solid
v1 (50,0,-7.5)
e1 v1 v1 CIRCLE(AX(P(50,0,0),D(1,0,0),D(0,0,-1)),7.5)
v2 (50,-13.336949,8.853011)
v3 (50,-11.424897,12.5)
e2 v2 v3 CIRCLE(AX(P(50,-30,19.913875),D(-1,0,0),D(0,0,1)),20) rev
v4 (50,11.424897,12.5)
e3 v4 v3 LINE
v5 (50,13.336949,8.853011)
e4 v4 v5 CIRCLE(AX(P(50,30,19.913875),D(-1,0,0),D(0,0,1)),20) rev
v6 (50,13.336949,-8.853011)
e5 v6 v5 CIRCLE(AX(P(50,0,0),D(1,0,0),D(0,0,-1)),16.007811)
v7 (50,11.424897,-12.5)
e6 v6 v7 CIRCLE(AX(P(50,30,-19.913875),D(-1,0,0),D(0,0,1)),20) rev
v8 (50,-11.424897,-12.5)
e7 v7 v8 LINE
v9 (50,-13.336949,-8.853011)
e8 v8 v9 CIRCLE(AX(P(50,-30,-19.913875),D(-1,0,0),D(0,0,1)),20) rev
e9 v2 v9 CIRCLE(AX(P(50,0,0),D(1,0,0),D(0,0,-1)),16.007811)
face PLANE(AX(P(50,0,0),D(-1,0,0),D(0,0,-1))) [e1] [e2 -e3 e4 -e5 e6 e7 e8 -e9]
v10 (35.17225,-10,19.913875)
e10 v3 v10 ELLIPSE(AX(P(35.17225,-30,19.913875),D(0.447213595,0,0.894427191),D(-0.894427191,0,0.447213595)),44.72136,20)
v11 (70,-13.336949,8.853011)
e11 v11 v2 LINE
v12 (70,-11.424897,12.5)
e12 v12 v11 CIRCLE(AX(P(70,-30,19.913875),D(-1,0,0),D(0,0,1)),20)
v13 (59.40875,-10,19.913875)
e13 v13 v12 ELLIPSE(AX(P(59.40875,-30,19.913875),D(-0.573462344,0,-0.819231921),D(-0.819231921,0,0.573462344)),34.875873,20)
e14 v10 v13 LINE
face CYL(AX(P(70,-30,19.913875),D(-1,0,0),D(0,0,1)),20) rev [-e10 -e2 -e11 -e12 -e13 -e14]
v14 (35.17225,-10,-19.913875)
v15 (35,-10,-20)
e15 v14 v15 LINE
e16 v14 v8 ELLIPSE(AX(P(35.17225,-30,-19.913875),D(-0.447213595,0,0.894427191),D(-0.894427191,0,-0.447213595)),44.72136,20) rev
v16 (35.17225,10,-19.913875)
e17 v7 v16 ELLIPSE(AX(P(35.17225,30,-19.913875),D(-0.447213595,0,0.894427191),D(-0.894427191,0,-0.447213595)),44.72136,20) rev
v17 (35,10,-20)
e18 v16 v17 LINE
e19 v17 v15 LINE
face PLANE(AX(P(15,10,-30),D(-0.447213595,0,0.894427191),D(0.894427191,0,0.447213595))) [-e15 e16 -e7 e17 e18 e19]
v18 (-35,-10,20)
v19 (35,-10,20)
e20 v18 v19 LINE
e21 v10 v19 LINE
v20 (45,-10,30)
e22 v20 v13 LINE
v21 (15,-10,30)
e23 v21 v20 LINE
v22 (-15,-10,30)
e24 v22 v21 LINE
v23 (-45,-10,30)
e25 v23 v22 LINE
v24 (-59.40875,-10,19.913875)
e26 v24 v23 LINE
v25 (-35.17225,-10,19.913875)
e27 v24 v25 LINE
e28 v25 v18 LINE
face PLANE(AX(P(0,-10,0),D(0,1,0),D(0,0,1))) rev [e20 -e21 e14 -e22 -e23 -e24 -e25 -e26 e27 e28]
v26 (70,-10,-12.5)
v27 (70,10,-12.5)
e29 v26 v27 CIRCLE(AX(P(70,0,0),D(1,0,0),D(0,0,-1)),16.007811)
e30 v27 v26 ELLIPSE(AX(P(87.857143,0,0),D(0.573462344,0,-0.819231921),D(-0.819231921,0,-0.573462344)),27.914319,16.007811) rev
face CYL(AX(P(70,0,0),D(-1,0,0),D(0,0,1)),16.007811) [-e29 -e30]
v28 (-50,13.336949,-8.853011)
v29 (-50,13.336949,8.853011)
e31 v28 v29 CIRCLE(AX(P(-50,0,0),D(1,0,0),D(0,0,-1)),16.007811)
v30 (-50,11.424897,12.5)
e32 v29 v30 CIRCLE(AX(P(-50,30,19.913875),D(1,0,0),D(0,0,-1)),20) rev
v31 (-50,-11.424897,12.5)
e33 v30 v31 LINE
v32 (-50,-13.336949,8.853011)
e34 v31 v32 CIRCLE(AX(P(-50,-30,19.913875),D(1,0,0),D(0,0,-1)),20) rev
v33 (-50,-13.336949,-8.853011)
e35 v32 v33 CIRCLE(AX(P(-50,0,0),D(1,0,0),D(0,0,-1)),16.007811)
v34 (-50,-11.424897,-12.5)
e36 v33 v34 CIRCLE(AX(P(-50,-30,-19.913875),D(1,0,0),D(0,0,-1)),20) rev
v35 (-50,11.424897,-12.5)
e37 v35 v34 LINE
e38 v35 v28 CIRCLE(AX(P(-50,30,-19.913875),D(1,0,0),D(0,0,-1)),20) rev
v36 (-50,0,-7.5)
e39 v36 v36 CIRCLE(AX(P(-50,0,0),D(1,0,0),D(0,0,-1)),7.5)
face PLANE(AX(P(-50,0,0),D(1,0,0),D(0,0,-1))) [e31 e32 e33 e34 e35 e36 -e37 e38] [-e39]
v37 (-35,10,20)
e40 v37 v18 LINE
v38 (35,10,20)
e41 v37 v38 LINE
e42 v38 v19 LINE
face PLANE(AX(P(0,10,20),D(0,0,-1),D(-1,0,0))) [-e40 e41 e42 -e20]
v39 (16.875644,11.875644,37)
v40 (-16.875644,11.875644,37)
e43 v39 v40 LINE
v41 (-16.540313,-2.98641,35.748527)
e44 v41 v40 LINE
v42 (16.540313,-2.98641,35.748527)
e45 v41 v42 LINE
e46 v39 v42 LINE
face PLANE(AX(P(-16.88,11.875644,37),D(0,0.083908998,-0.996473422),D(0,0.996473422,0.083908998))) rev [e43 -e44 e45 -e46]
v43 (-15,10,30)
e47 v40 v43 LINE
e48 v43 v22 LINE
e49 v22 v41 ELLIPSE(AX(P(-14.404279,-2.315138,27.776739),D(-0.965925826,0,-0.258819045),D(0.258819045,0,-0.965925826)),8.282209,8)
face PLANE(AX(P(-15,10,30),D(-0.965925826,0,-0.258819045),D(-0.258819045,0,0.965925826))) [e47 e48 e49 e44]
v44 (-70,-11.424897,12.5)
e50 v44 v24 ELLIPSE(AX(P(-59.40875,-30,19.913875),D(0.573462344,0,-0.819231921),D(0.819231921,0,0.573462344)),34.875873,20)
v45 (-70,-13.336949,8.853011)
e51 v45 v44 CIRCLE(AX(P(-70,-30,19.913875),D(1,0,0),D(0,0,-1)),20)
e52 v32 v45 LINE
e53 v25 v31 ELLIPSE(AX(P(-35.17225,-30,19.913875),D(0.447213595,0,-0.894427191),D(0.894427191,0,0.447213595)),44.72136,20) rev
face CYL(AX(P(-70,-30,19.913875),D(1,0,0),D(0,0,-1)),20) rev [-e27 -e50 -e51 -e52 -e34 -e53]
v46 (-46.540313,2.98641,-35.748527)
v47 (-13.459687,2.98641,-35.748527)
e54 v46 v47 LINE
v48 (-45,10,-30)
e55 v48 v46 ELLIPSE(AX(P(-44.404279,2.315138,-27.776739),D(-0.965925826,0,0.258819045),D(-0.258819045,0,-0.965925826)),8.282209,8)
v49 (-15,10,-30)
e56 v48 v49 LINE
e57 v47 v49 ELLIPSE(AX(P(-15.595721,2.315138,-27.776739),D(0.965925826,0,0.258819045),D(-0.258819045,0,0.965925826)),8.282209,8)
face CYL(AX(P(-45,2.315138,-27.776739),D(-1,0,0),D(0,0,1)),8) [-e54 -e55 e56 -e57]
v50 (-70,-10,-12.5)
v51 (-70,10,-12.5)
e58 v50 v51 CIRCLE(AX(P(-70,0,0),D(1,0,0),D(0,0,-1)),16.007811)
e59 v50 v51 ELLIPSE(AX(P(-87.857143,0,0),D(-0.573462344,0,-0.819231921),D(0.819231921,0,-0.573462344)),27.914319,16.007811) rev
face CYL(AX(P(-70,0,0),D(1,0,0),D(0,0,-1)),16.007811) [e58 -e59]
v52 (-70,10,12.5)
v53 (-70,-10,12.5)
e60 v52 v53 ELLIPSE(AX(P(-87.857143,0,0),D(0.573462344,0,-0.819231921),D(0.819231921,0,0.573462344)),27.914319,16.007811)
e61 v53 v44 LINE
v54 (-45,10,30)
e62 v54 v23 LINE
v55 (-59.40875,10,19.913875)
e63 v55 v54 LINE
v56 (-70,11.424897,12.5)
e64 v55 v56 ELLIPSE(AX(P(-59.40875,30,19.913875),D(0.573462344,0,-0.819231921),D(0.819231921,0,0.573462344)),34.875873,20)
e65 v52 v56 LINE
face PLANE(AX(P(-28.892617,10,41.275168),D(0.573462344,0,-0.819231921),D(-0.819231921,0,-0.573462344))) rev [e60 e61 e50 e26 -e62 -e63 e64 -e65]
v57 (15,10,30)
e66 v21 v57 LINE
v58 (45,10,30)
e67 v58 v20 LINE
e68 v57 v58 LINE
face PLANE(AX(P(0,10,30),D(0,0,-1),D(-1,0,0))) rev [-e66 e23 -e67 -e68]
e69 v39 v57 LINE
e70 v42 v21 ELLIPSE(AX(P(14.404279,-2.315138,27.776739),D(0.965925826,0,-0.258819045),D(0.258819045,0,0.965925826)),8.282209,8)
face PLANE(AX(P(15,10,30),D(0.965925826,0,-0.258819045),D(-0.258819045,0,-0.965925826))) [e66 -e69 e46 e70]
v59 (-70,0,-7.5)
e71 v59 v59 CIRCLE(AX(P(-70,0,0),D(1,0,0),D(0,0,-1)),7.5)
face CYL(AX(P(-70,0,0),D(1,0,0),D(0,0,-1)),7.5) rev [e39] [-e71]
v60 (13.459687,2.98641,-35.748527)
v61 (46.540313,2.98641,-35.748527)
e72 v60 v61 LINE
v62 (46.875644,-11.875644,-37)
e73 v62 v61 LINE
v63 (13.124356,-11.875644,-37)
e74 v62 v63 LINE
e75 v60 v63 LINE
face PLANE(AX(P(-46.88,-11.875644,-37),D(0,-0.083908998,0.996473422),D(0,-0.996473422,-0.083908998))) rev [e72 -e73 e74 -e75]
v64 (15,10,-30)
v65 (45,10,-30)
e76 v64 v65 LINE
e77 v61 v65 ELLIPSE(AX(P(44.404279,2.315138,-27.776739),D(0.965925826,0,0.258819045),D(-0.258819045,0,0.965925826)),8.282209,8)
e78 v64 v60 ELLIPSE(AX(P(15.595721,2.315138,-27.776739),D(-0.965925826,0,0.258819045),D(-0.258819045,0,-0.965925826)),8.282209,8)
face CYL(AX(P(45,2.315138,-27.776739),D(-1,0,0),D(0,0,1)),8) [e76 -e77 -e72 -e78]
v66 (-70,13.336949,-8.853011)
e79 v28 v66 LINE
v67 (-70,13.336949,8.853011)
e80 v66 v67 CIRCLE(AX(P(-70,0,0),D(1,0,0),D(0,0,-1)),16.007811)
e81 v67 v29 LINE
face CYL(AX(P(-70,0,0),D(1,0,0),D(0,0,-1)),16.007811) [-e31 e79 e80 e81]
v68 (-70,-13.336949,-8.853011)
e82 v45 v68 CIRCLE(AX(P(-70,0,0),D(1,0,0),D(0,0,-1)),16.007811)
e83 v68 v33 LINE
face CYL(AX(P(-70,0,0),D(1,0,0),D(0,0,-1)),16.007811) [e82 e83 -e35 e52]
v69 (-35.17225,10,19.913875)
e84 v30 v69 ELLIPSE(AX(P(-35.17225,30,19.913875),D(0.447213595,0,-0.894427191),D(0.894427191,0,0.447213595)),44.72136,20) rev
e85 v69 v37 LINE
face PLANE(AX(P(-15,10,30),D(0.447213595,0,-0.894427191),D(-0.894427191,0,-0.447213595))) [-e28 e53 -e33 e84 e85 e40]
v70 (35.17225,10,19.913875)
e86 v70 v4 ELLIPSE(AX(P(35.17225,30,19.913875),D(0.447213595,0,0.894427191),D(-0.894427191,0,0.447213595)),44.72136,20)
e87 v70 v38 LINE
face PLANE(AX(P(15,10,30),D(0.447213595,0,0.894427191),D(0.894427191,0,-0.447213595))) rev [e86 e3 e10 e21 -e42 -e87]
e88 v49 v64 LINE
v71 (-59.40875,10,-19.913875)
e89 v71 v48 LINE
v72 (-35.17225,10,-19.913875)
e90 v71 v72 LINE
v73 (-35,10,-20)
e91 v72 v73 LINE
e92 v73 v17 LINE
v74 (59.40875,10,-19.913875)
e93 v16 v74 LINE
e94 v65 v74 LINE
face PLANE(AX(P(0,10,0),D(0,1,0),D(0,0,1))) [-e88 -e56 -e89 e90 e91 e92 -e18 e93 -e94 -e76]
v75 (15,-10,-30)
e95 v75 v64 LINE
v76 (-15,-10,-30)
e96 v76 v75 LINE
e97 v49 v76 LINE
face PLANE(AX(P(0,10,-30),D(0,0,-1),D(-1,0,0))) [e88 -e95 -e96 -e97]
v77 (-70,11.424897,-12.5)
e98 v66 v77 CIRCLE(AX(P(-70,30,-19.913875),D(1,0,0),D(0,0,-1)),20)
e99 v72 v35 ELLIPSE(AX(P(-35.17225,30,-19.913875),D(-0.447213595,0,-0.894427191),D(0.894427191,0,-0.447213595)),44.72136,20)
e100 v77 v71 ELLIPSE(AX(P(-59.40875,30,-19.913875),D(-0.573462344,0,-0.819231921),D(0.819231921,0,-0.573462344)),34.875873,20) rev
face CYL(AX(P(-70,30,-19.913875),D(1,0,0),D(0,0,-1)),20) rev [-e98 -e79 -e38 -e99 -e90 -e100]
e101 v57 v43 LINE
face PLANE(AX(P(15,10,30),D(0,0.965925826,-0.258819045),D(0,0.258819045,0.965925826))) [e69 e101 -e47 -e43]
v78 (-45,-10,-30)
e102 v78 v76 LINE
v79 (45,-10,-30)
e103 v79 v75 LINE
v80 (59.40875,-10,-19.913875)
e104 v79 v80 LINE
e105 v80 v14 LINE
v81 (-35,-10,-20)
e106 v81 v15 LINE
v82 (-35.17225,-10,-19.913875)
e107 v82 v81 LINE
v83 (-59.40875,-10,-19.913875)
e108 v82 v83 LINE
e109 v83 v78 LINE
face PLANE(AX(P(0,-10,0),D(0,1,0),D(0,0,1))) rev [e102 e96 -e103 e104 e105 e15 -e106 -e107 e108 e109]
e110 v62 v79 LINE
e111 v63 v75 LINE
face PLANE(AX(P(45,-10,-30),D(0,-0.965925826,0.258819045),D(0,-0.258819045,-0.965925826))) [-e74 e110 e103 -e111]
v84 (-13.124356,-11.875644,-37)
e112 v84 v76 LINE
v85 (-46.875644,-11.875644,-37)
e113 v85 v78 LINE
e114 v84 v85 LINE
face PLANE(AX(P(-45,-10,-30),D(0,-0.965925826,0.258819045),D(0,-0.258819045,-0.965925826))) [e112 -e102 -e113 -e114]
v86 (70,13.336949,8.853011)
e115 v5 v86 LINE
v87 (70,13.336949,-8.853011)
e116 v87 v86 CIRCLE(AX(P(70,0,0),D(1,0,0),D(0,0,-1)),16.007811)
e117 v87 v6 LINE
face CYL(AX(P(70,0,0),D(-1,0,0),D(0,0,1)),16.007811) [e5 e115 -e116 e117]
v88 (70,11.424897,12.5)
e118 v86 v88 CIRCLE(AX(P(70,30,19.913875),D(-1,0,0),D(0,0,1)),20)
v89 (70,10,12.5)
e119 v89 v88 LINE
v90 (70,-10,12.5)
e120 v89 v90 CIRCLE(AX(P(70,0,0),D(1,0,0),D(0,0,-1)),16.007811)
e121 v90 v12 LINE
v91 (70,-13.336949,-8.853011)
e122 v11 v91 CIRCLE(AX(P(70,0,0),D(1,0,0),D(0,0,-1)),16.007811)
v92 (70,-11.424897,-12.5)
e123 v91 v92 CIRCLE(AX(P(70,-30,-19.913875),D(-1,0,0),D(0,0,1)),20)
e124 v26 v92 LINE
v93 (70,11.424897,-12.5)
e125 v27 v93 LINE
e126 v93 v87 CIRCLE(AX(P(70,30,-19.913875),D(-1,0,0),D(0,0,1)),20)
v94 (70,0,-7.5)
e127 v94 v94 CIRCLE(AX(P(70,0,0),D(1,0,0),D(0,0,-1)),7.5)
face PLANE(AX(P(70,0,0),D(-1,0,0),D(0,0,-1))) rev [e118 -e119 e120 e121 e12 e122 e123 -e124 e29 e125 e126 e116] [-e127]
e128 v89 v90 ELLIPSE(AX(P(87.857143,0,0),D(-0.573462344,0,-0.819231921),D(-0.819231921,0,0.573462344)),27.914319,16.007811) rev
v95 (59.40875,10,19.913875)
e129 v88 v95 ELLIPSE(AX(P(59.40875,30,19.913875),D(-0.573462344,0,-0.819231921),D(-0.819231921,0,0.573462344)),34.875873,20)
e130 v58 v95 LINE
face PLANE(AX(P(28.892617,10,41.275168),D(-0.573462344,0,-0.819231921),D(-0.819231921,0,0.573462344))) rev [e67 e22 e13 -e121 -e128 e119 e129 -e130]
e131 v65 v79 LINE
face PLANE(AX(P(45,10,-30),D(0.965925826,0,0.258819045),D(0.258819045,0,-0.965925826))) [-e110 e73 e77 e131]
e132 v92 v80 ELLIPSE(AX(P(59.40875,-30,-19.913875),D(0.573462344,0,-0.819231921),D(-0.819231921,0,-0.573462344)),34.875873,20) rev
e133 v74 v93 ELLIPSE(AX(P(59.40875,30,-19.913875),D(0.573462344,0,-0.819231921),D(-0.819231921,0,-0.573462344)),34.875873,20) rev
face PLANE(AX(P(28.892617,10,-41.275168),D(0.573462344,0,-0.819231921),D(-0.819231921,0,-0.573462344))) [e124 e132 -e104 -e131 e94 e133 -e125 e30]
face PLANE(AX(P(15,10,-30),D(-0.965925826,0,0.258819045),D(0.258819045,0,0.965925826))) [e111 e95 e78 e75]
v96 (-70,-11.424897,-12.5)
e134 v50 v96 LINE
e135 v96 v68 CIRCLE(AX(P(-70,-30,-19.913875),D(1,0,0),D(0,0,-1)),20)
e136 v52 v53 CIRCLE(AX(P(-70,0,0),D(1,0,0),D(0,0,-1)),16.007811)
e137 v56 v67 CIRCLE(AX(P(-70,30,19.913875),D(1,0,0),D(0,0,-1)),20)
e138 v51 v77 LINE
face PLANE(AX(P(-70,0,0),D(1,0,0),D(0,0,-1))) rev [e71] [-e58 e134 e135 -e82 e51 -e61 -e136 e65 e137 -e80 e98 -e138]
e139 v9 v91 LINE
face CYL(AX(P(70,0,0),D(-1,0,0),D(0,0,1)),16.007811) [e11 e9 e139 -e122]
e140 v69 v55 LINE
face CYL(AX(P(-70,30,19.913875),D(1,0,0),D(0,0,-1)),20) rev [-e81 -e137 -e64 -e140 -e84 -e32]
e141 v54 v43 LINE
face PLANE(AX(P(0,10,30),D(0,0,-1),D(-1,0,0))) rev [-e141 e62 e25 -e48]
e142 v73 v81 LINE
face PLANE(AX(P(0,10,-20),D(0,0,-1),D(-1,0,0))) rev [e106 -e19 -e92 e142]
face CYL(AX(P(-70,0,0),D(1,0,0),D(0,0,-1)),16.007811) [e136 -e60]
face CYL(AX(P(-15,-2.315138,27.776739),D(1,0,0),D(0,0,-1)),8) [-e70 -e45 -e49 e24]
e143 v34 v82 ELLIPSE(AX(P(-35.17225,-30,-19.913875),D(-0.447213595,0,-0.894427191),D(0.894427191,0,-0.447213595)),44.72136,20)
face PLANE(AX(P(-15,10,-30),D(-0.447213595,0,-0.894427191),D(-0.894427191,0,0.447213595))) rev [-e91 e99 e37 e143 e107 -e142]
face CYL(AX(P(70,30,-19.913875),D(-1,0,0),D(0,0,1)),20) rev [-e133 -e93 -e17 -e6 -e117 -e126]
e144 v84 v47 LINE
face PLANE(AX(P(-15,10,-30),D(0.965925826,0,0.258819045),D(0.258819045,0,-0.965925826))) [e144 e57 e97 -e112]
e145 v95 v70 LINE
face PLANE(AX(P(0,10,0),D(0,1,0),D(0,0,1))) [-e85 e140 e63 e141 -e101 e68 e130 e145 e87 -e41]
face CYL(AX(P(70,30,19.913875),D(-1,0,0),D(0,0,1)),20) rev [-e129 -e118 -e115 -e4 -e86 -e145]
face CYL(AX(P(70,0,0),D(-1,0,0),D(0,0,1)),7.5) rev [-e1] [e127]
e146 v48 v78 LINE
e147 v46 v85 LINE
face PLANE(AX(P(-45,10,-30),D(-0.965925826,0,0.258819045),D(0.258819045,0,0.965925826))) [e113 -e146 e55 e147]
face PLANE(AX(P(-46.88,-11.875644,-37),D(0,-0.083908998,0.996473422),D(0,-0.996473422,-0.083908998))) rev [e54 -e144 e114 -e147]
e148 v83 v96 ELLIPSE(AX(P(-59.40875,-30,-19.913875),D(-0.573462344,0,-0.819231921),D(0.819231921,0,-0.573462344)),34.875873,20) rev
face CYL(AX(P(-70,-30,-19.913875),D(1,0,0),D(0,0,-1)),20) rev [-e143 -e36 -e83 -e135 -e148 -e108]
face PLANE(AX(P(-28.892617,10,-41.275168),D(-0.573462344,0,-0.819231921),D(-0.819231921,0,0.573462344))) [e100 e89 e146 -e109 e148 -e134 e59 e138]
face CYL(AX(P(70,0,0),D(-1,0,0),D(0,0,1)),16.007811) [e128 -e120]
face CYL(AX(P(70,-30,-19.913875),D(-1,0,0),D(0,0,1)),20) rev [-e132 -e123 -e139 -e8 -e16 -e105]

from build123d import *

# Parameters (mm, degrees)
RESSALTO_EXTRUS_O1_DEPTH           = 10
RESSALTO_EXTRUS_O1_2_DEPTH         = 10
ESBO_O2_R                          = 16.007810594
ESBO_O2_R_2                        = 7.5
RESSALTO_EXTRUS_O2_DEPTH           = 20
FILETE1_R                          = 20
ESBO_O3_W                          = 30
ESBO_O3_H                          = 20
RESSALTO_EXTRUS_O3_DEPTH           = 7
RESSALTO_EXTRUS_O3_DRAFT           = -15
ESBO_O4_W                          = 30
ESBO_O4_H                          = 20
RESSALTO_EXTRUS_O4_DEPTH           = 7
RESSALTO_EXTRUS_O4_DRAFT           = -15
RESSALTO_EXTRUS_O4_PROFILE_2_DEPTH = 7
RESSALTO_EXTRUS_O4_PROFILE_2_DRAFT = -15
CORTE_EXTRUS_O1_DEPTH              = 16.88
CORTE_EXTRUS_O2_DEPTH              = 46.88
FILETE4_R                          = 8


with BuildPart() as part:
    # Esboço1 → Ressalto-extrusão1 (new, symmetric)
    with BuildSketch(Plane(origin=(0, 0, 0), x_dir=(1, 0, 0), z_dir=(0, 1, 0))):
        Polygon((45, -30), (70, -12.5), (50, -12.5), (35, -20), (-35, -20), (-50, -12.5), (-70, -12.5), (-45, -30), align=None)
    extrude(amount=RESSALTO_EXTRUS_O1_DEPTH, both=True)



with BuildPart() as body_2:
    # Esboço1 → Ressalto-extrus_o1 2 (new, symmetric)
    with BuildSketch(Plane(origin=(0, 0, 0), x_dir=(1, 0, 0), z_dir=(0, 1, 0))):
        Polygon((70, 12.5), (50, 12.5), (35, 20), (-35, 20), (-50, 12.5), (-70, 12.5), (-45, 30), (45, 30), align=None)
    extrude(amount=RESSALTO_EXTRUS_O1_2_DEPTH, both=True)


with BuildPart() as part_1:
    add(part.part)

    add(body_2.part)  # Ressalto-extrusão2 merges body 2
    # Esboço2 → Ressalto-extrusão2 (add)
    with BuildSketch(Plane(origin=(-50, 0, 0), x_dir=(0, 0, -1), z_dir=(1, 0, 0))):
        Circle(ESBO_O2_R)
        Circle(ESBO_O2_R_2, mode=Mode.SUBTRACT)
    ressalto_extrus_o2 = extrude(amount=-RESSALTO_EXTRUS_O2_DEPTH)

    # Espelhar1: Ressalto-extrusão2 across plane
    add(ressalto_extrus_o2.mirror(Plane(origin=(0, 0, 0), x_dir=(0, 0, 1), z_dir=(1, 0, 0))))

    # Filete1
    # the kernel refuses this fillet: 20 mm, written as the material it adds along each edge
    with BuildSketch(Plane(origin=(70, -10, 12.5), x_dir=(0, 0, 1), z_dir=(-1, 0, 0))) as filete1_piece_1_section:
        with BuildLine():
            CenterArc((7.413875156, -20), FILETE1_R, 90, 33.576041437)
            ThreePointArc((-3.646989044, -3.336948565), (-1.693910252, -1.810098405), (0, 0))
            Line((0, 0), (7.413875156, 0))
        make_face()
    filete1_piece_1 = extrude(amount=20, mode=Mode.PRIVATE)
    filete1_piece_1 = split(filete1_piece_1, bisect_by=Plane(origin=(62.463989949, -10.639640977, 17.775207036), z_dir=(-0.5734623443633283, 0, -0.8192319205190406)), keep=Keep.TOP, mode=Mode.PRIVATE)
    filete1_piece_1 = split(filete1_piece_1, bisect_by=Plane(origin=(57.171735223, -10.639640977, 8.914132389), z_dir=(0.4472135954999588, 0, 0.8944271909999154)), keep=Keep.TOP, mode=Mode.PRIVATE)
    add(filete1_piece_1)
    with BuildSketch(Plane(origin=(70, -10, 12.5), x_dir=(0, 0, 1), z_dir=(-1, 0, 0))) as filete1_piece_2_section:
        with BuildLine():
            CenterArc((7.413875156, -20), FILETE1_R, 90, 33.576041437)
            ThreePointArc((-3.646989044, -3.336948565), (-1.693910252, -1.810098405), (0, 0))
            Line((0, 0), (7.413875156, 0))
        make_face()
    filete1_piece_2 = extrude(amount=20, mode=Mode.PRIVATE)
    filete1_piece_2 = split(filete1_piece_2, bisect_by=Plane(origin=(52.590686854, -12.043119704, 11.204656573), z_dir=(-0.4472135954999588, 0, -0.8944271909999154)), keep=Keep.TOP, mode=Mode.PRIVATE)
    add(filete1_piece_2)
    with BuildSketch(Plane(origin=(70, -10, 12.5), x_dir=(0, 0, 1), z_dir=(-1, 0, 0))) as filete1_piece_3_section:
        with BuildLine():
            CenterArc((7.413875156, -20), FILETE1_R, 90, 33.576041437)
            ThreePointArc((-3.646989044, -3.336948565), (-1.693910252, -1.810098405), (0, 0))
            Line((0, 0), (7.413875156, 0))
        make_face()
    filete1_piece_3 = extrude(amount=38.534687891, mode=Mode.PRIVATE)
    filete1_piece_3 = split(filete1_piece_3, bisect_by=Plane(origin=(44.945861579, -9.976895513, 15.027069211), z_dir=(0.4472135954999588, 0, 0.8944271909999154)), keep=Keep.TOP, mode=Mode.PRIVATE)
    filete1_piece_3 = split(filete1_piece_3, bisect_by=Plane(origin=(50, -9.976895513, 16.711782017), z_dir=(-1, 0, 0)), keep=Keep.TOP, mode=Mode.PRIVATE)
    add(filete1_piece_3)
    with BuildSketch(Plane(origin=(-31.465312109, 10, 12.5), x_dir=(0, 0.6750510749314106, -0.7377709985042425), z_dir=(-1, 0, 0))) as filete1_piece_4_section:
        with BuildLine():
            CenterArc((8.031279422, -19.760164364), FILETE1_R, 98.882075154, 33.576041437)
            Line((-5.469742077, -5.004744394), (0, 0))
            ThreePointArc((0, 0), (2.471626732, -0.191962172), (4.943253464, 0))
        make_face()
    filete1_piece_4 = extrude(amount=38.534687891, mode=Mode.PRIVATE)
    filete1_piece_4 = split(filete1_piece_4, bisect_by=Plane(origin=(-50, 9.976895512, 16.711782019), z_dir=(1, 0, 0)), keep=Keep.TOP, mode=Mode.PRIVATE)
    filete1_piece_4 = split(filete1_piece_4, bisect_by=Plane(origin=(-44.945861578, 9.976895512, 15.027069211), z_dir=(-0.4472135954999591, 0, 0.8944271909999153)), keep=Keep.TOP, mode=Mode.PRIVATE)
    add(filete1_piece_4)
    with BuildSketch(Plane(origin=(-50, 10, 12.5), x_dir=(0, 0.6750510749314104, -0.7377709985042427), z_dir=(-1, 0, 0))) as filete1_piece_5_section:
        with BuildLine():
            CenterArc((8.031279422, -19.760164364), FILETE1_R, 98.882075154, 33.576041437)
            Line((-5.469742077, -5.004744394), (0, 0))
            ThreePointArc((0, 0), (2.471626732, -0.191962172), (4.943253464, 0))
        make_face()
    filete1_piece_5 = extrude(amount=20, mode=Mode.PRIVATE)
    filete1_piece_5 = split(filete1_piece_5, bisect_by=Plane(origin=(-52.590686846, 12.043119705, 11.204656577), z_dir=(0.4472135954999591, 0, -0.8944271909999153)), keep=Keep.TOP, mode=Mode.PRIVATE)
    add(filete1_piece_5)
    with BuildSketch(Plane(origin=(-50, 10, 12.5), x_dir=(0, 0.6750510749314104, -0.7377709985042427), z_dir=(-1, 0, 0))) as filete1_piece_6_section:
        with BuildLine():
            CenterArc((8.031279422, -19.760164364), FILETE1_R, 98.882075154, 33.576041437)
            Line((-5.469742077, -5.004744394), (0, 0))
            ThreePointArc((0, 0), (2.471626732, -0.191962172), (4.943253464, 0))
        make_face()
    filete1_piece_6 = extrude(amount=20, mode=Mode.PRIVATE)
    filete1_piece_6 = split(filete1_piece_6, bisect_by=Plane(origin=(-62.463989948, 10.639640977, 17.775207036), z_dir=(0.5734623443633283, 0, -0.8192319205190406)), keep=Keep.TOP, mode=Mode.PRIVATE)
    filete1_piece_6 = split(filete1_piece_6, bisect_by=Plane(origin=(-57.171735222, 10.639640977, 8.914132389), z_dir=(-0.4472135954999591, 0, 0.8944271909999153)), keep=Keep.TOP, mode=Mode.PRIVATE)
    add(filete1_piece_6)
    with BuildSketch(Plane(origin=(70, 10, -12.5), x_dir=(0, 0.67505107493141, 0.737770998504243), z_dir=(-1, 0, 0))) as filete1_piece_7_section:
        with BuildLine():
            CenterArc((8.031279422, 19.760164364), FILETE1_R, 227.541883409, 33.576041437)
            Line((-5.469742077, 5.004744394), (0, 0))
            ThreePointArc((0, 0), (2.471626732, 0.191962172), (4.943253464, 0))
        make_face()
    filete1_piece_7 = extrude(amount=20, mode=Mode.PRIVATE)
    filete1_piece_7 = split(filete1_piece_7, bisect_by=Plane(origin=(57.171735222, 10.639640977, -8.914132389), z_dir=(0.44721359549995815, 0, -0.8944271909999159)), keep=Keep.TOP, mode=Mode.PRIVATE)
    filete1_piece_7 = split(filete1_piece_7, bisect_by=Plane(origin=(62.463989948, 10.639640977, -17.775207036), z_dir=(-0.5734623443633284, 0, 0.8192319205190405)), keep=Keep.TOP, mode=Mode.PRIVATE)
    add(filete1_piece_7)
    with BuildSketch(Plane(origin=(70, 10, -12.5), x_dir=(0, 0.67505107493141, 0.737770998504243), z_dir=(-1, 0, 0))) as filete1_piece_8_section:
        with BuildLine():
            CenterArc((8.031279422, 19.760164364), FILETE1_R, 227.541883409, 33.576041437)
            Line((-5.469742077, 5.004744394), (0, 0))
            ThreePointArc((0, 0), (2.471626732, 0.191962172), (4.943253464, 0))
        make_face()
    filete1_piece_8 = extrude(amount=38.534687891, mode=Mode.PRIVATE)
    filete1_piece_8 = split(filete1_piece_8, bisect_by=Plane(origin=(44.945861578, 9.976895512, -15.027069211), z_dir=(0.44721359549995815, 0, -0.8944271909999159)), keep=Keep.TOP, mode=Mode.PRIVATE)
    filete1_piece_8 = split(filete1_piece_8, bisect_by=Plane(origin=(50, 9.976895512, -16.711782019), z_dir=(-1, 0, 0)), keep=Keep.TOP, mode=Mode.PRIVATE)
    add(filete1_piece_8)
    with BuildSketch(Plane(origin=(70, 10, -12.5), x_dir=(0, 0.67505107493141, 0.737770998504243), z_dir=(-1, 0, 0))) as filete1_piece_9_section:
        with BuildLine():
            CenterArc((8.031279422, 19.760164364), FILETE1_R, 227.541883409, 33.576041437)
            Line((-5.469742077, 5.004744394), (0, 0))
            ThreePointArc((0, 0), (2.471626732, 0.191962172), (4.943253464, 0))
        make_face()
    filete1_piece_9 = extrude(amount=20, mode=Mode.PRIVATE)
    filete1_piece_9 = split(filete1_piece_9, bisect_by=Plane(origin=(52.590686846, 12.043119705, -11.204656577), z_dir=(-0.44721359549995815, 0, 0.8944271909999159)), keep=Keep.TOP, mode=Mode.PRIVATE)
    add(filete1_piece_9)
    with BuildSketch(Plane(origin=(-50, 10, -12.5), x_dir=(0, 0, -1), z_dir=(-1, 0, 0))) as filete1_piece_10_section:
        with BuildLine():
            CenterArc((7.413875156, -20), FILETE1_R, 90, 33.576041437)
            ThreePointArc((-3.646989044, -3.336948565), (-1.693910252, -1.810098405), (0, 0))
            Line((0, 0), (7.413875156, 0))
        make_face()
    filete1_piece_10 = extrude(amount=20, mode=Mode.PRIVATE)
    filete1_piece_10 = split(filete1_piece_10, bisect_by=Plane(origin=(-52.590686854, 12.043119704, -11.204656573), z_dir=(0.44721359549995776, 0, 0.894427190999916)), keep=Keep.TOP, mode=Mode.PRIVATE)
    add(filete1_piece_10)
    with BuildSketch(Plane(origin=(-31.465312109, 10, -12.5), x_dir=(0, 0, -1), z_dir=(-1, 0, 0))) as filete1_piece_11_section:
        with BuildLine():
            CenterArc((7.413875156, -20), FILETE1_R, 90, 33.576041437)
            ThreePointArc((-3.646989044, -3.336948565), (-1.693910252, -1.810098405), (0, 0))
            Line((0, 0), (7.413875156, 0))
        make_face()
    filete1_piece_11 = extrude(amount=38.534687891, mode=Mode.PRIVATE)
    filete1_piece_11 = split(filete1_piece_11, bisect_by=Plane(origin=(-50, 9.976895513, -16.711782017), z_dir=(1, 0, 0)), keep=Keep.TOP, mode=Mode.PRIVATE)
    filete1_piece_11 = split(filete1_piece_11, bisect_by=Plane(origin=(-44.945861579, 9.976895513, -15.027069211), z_dir=(-0.44721359549995776, 0, -0.894427190999916)), keep=Keep.TOP, mode=Mode.PRIVATE)
    add(filete1_piece_11)
    with BuildSketch(Plane(origin=(-50, 10, -12.5), x_dir=(0, 0, -1), z_dir=(-1, 0, 0))) as filete1_piece_12_section:
        with BuildLine():
            CenterArc((7.413875156, -20), FILETE1_R, 90, 33.576041437)
            ThreePointArc((-3.646989044, -3.336948565), (-1.693910252, -1.810098405), (0, 0))
            Line((0, 0), (7.413875156, 0))
        make_face()
    filete1_piece_12 = extrude(amount=20, mode=Mode.PRIVATE)
    filete1_piece_12 = split(filete1_piece_12, bisect_by=Plane(origin=(-57.171735223, 10.639640977, -8.914132389), z_dir=(-0.44721359549995776, 0, -0.894427190999916)), keep=Keep.TOP, mode=Mode.PRIVATE)
    filete1_piece_12 = split(filete1_piece_12, bisect_by=Plane(origin=(-62.463989949, 10.639640977, -17.775207036), z_dir=(0.5734623443633284, 0, 0.8192319205190404)), keep=Keep.TOP, mode=Mode.PRIVATE)
    add(filete1_piece_12)
    with BuildSketch(Plane(origin=(70, -10, -12.5), x_dir=(0, 0, -1), z_dir=(-1, 0, 0))) as filete1_piece_13_section:
        with BuildLine():
            CenterArc((7.413875156, 20), FILETE1_R, 236.423958563, 33.576041437)
            ThreePointArc((-3.646989044, 3.336948565), (-1.693910252, 1.810098405), (0, 0))
            Line((0, 0), (7.413875156, 0))
        make_face()
    filete1_piece_13 = extrude(amount=20, mode=Mode.PRIVATE)
    filete1_piece_13 = split(filete1_piece_13, bisect_by=Plane(origin=(57.171735223, -10.639640977, -8.914132389), z_dir=(0.44721359549995815, 0, -0.8944271909999159)), keep=Keep.TOP, mode=Mode.PRIVATE)
    filete1_piece_13 = split(filete1_piece_13, bisect_by=Plane(origin=(62.463989949, -10.639640977, -17.775207036), z_dir=(-0.5734623443633284, 0, 0.8192319205190405)), keep=Keep.TOP, mode=Mode.PRIVATE)
    add(filete1_piece_13)
    with BuildSketch(Plane(origin=(70, -10, -12.5), x_dir=(0, 0, -1), z_dir=(-1, 0, 0))) as filete1_piece_14_section:
        with BuildLine():
            CenterArc((7.413875156, 20), FILETE1_R, 236.423958563, 33.576041437)
            ThreePointArc((-3.646989044, 3.336948565), (-1.693910252, 1.810098405), (0, 0))
            Line((0, 0), (7.413875156, 0))
        make_face()
    filete1_piece_14 = extrude(amount=20, mode=Mode.PRIVATE)
    filete1_piece_14 = split(filete1_piece_14, bisect_by=Plane(origin=(52.590686854, -12.043119704, -11.204656573), z_dir=(-0.44721359549995815, 0, 0.8944271909999159)), keep=Keep.TOP, mode=Mode.PRIVATE)
    add(filete1_piece_14)
    with BuildSketch(Plane(origin=(70, -10, -12.5), x_dir=(0, 0, -1), z_dir=(-1, 0, 0))) as filete1_piece_15_section:
        with BuildLine():
            CenterArc((7.413875156, 20), FILETE1_R, 236.423958563, 33.576041437)
            ThreePointArc((-3.646989044, 3.336948565), (-1.693910252, 1.810098405), (0, 0))
            Line((0, 0), (7.413875156, 0))
        make_face()
    filete1_piece_15 = extrude(amount=38.534687891, mode=Mode.PRIVATE)
    filete1_piece_15 = split(filete1_piece_15, bisect_by=Plane(origin=(44.945861579, -9.976895513, -15.027069211), z_dir=(0.44721359549995815, 0, -0.8944271909999159)), keep=Keep.TOP, mode=Mode.PRIVATE)
    filete1_piece_15 = split(filete1_piece_15, bisect_by=Plane(origin=(50, -9.976895513, -16.711782017), z_dir=(-1, 0, 0)), keep=Keep.TOP, mode=Mode.PRIVATE)
    add(filete1_piece_15)
    with BuildSketch(Plane(origin=(-50, -10, -12.5), x_dir=(0, 0, -1), z_dir=(-1, 0, 0))) as filete1_piece_16_section:
        with BuildLine():
            CenterArc((7.413875156, 20), FILETE1_R, 236.423958563, 33.576041437)
            ThreePointArc((-3.646989044, 3.336948565), (-1.693910252, 1.810098405), (0, 0))
            Line((0, 0), (7.413875156, 0))
        make_face()
    filete1_piece_16 = extrude(amount=20, mode=Mode.PRIVATE)
    filete1_piece_16 = split(filete1_piece_16, bisect_by=Plane(origin=(-52.590686854, -12.043119704, -11.204656573), z_dir=(0.44721359549995776, 0, 0.894427190999916)), keep=Keep.TOP, mode=Mode.PRIVATE)
    add(filete1_piece_16)
    with BuildSketch(Plane(origin=(-31.465312109, -10, -12.5), x_dir=(0, 0, -1), z_dir=(-1, 0, 0))) as filete1_piece_17_section:
        with BuildLine():
            CenterArc((7.413875156, 20), FILETE1_R, 236.423958563, 33.576041437)
            ThreePointArc((-3.646989044, 3.336948565), (-1.693910252, 1.810098405), (0, 0))
            Line((0, 0), (7.413875156, 0))
        make_face()
    filete1_piece_17 = extrude(amount=38.534687891, mode=Mode.PRIVATE)
    filete1_piece_17 = split(filete1_piece_17, bisect_by=Plane(origin=(-50, -9.976895513, -16.711782017), z_dir=(1, 0, 0)), keep=Keep.TOP, mode=Mode.PRIVATE)
    filete1_piece_17 = split(filete1_piece_17, bisect_by=Plane(origin=(-44.945861579, -9.976895513, -15.027069211), z_dir=(-0.44721359549995776, 0, -0.894427190999916)), keep=Keep.TOP, mode=Mode.PRIVATE)
    add(filete1_piece_17)
    with BuildSketch(Plane(origin=(-50, -10, -12.5), x_dir=(0, 0, -1), z_dir=(-1, 0, 0))) as filete1_piece_18_section:
        with BuildLine():
            CenterArc((7.413875156, 20), FILETE1_R, 236.423958563, 33.576041437)
            ThreePointArc((-3.646989044, 3.336948565), (-1.693910252, 1.810098405), (0, 0))
            Line((0, 0), (7.413875156, 0))
        make_face()
    filete1_piece_18 = extrude(amount=20, mode=Mode.PRIVATE)
    filete1_piece_18 = split(filete1_piece_18, bisect_by=Plane(origin=(-57.171735223, -10.639640977, -8.914132389), z_dir=(-0.44721359549995776, 0, -0.894427190999916)), keep=Keep.TOP, mode=Mode.PRIVATE)
    filete1_piece_18 = split(filete1_piece_18, bisect_by=Plane(origin=(-62.463989949, -10.639640977, -17.775207036), z_dir=(0.5734623443633284, 0, 0.8192319205190404)), keep=Keep.TOP, mode=Mode.PRIVATE)
    add(filete1_piece_18)
    with BuildSketch(Plane(origin=(70, 10, 12.5), x_dir=(0, 0.6750510749314104, -0.7377709985042427), z_dir=(-1, 0, 0))) as filete1_piece_19_section:
        with BuildLine():
            CenterArc((8.031279422, -19.760164364), FILETE1_R, 98.882075154, 33.576041437)
            Line((-5.469742077, -5.004744394), (0, 0))
            ThreePointArc((0, 0), (2.471626732, -0.191962172), (4.943253464, 0))
        make_face()
    filete1_piece_19 = extrude(amount=20, mode=Mode.PRIVATE)
    filete1_piece_19 = split(filete1_piece_19, bisect_by=Plane(origin=(62.463989948, 10.639640977, 17.775207036), z_dir=(-0.5734623443633283, 0, -0.8192319205190406)), keep=Keep.TOP, mode=Mode.PRIVATE)
    filete1_piece_19 = split(filete1_piece_19, bisect_by=Plane(origin=(57.171735222, 10.639640977, 8.914132389), z_dir=(0.4472135954999588, 0, 0.8944271909999154)), keep=Keep.TOP, mode=Mode.PRIVATE)
    add(filete1_piece_19)
    with BuildSketch(Plane(origin=(70, 10, 12.5), x_dir=(0, 0.6750510749314104, -0.7377709985042427), z_dir=(-1, 0, 0))) as filete1_piece_20_section:
        with BuildLine():
            CenterArc((8.031279422, -19.760164364), FILETE1_R, 98.882075154, 33.576041437)
            Line((-5.469742077, -5.004744394), (0, 0))
            ThreePointArc((0, 0), (2.471626732, -0.191962172), (4.943253464, 0))
        make_face()
    filete1_piece_20 = extrude(amount=38.534687891, mode=Mode.PRIVATE)
    filete1_piece_20 = split(filete1_piece_20, bisect_by=Plane(origin=(50, 9.976895512, 16.711782019), z_dir=(-1, 0, 0)), keep=Keep.TOP, mode=Mode.PRIVATE)
    filete1_piece_20 = split(filete1_piece_20, bisect_by=Plane(origin=(44.945861578, 9.976895512, 15.027069211), z_dir=(0.4472135954999588, 0, 0.8944271909999154)), keep=Keep.TOP, mode=Mode.PRIVATE)
    add(filete1_piece_20)
    with BuildSketch(Plane(origin=(70, 10, 12.5), x_dir=(0, 0.6750510749314104, -0.7377709985042427), z_dir=(-1, 0, 0))) as filete1_piece_21_section:
        with BuildLine():
            CenterArc((8.031279422, -19.760164364), FILETE1_R, 98.882075154, 33.576041437)
            Line((-5.469742077, -5.004744394), (0, 0))
            ThreePointArc((0, 0), (2.471626732, -0.191962172), (4.943253464, 0))
        make_face()
    filete1_piece_21 = extrude(amount=20, mode=Mode.PRIVATE)
    filete1_piece_21 = split(filete1_piece_21, bisect_by=Plane(origin=(52.590686846, 12.043119705, 11.204656577), z_dir=(-0.4472135954999588, 0, -0.8944271909999154)), keep=Keep.TOP, mode=Mode.PRIVATE)
    add(filete1_piece_21)
    with BuildSketch(Plane(origin=(-50, -10, 12.5), x_dir=(0, 0, 1), z_dir=(-1, 0, 0))) as filete1_piece_22_section:
        with BuildLine():
            CenterArc((7.413875156, -20), FILETE1_R, 90, 33.576041437)
            ThreePointArc((-3.646989044, -3.336948565), (-1.693910252, -1.810098405), (0, 0))
            Line((0, 0), (7.413875156, 0))
        make_face()
    filete1_piece_22 = extrude(amount=20, mode=Mode.PRIVATE)
    filete1_piece_22 = split(filete1_piece_22, bisect_by=Plane(origin=(-52.590686854, -12.043119704, 11.204656573), z_dir=(0.4472135954999591, 0, -0.8944271909999153)), keep=Keep.TOP, mode=Mode.PRIVATE)
    add(filete1_piece_22)
    with BuildSketch(Plane(origin=(-31.465312109, -10, 12.5), x_dir=(0, 0, 1), z_dir=(-1, 0, 0))) as filete1_piece_23_section:
        with BuildLine():
            CenterArc((7.413875156, -20), FILETE1_R, 90, 33.576041437)
            ThreePointArc((-3.646989044, -3.336948565), (-1.693910252, -1.810098405), (0, 0))
            Line((0, 0), (7.413875156, 0))
        make_face()
    filete1_piece_23 = extrude(amount=38.534687891, mode=Mode.PRIVATE)
    filete1_piece_23 = split(filete1_piece_23, bisect_by=Plane(origin=(-44.945861579, -9.976895513, 15.027069211), z_dir=(-0.4472135954999591, 0, 0.8944271909999153)), keep=Keep.TOP, mode=Mode.PRIVATE)
    filete1_piece_23 = split(filete1_piece_23, bisect_by=Plane(origin=(-50, -9.976895513, 16.711782017), z_dir=(1, 0, 0)), keep=Keep.TOP, mode=Mode.PRIVATE)
    add(filete1_piece_23)
    with BuildSketch(Plane(origin=(-50, -10, 12.5), x_dir=(0, 0, 1), z_dir=(-1, 0, 0))) as filete1_piece_24_section:
        with BuildLine():
            CenterArc((7.413875156, -20), FILETE1_R, 90, 33.576041437)
            ThreePointArc((-3.646989044, -3.336948565), (-1.693910252, -1.810098405), (0, 0))
            Line((0, 0), (7.413875156, 0))
        make_face()
    filete1_piece_24 = extrude(amount=20, mode=Mode.PRIVATE)
    filete1_piece_24 = split(filete1_piece_24, bisect_by=Plane(origin=(-57.171735223, -10.639640977, 8.914132389), z_dir=(-0.4472135954999591, 0, 0.8944271909999153)), keep=Keep.TOP, mode=Mode.PRIVATE)
    filete1_piece_24 = split(filete1_piece_24, bisect_by=Plane(origin=(-62.463989949, -10.639640977, 17.775207036), z_dir=(0.5734623443633283, 0, -0.8192319205190406)), keep=Keep.TOP, mode=Mode.PRIVATE)
    add(filete1_piece_24)


with BuildPart() as ressalto_extrus_o3_tool:
    # Esboço3 → Ressalto-extrusão3 (with draft: the straight prism first)
    with BuildSketch(Plane.XY.offset(30)):
        Rectangle(ESBO_O3_W, ESBO_O3_H)
    extrude(amount=RESSALTO_EXTRUS_O3_DEPTH)
    # Ressalto-extrusão3: the draft: its side faces are tilted about the plane it starts from
    ressalto_extrus_o3_sides = [ressalto_extrus_o3_tool.faces().sort_by_distance(p)[0] for p in [
        (0, -10, 33.5),
        (15, 0, 33.5),
        (0, 10, 33.5),
        (-15, 0, 33.5),
    ]]
    draft(ressalto_extrus_o3_sides, Plane.XY.offset(30), RESSALTO_EXTRUS_O3_DRAFT)


with BuildPart() as part_2:
    add(part_1.part)

    # Ressalto-extrusão3: add ressalto_extrus_o3_tool
    add(ressalto_extrus_o3_tool.part)


with BuildPart() as ressalto_extrus_o4_tool:
    # Esboço4 → Ressalto-extrusão4 (with draft: the straight prism first)
    with BuildSketch(Plane(origin=(0, 0, -30), x_dir=(-1, 0, 0), z_dir=(0, 0, -1))):
        with Locations((-30, 0)):
            Rectangle(ESBO_O4_W, ESBO_O4_H)
    extrude(amount=RESSALTO_EXTRUS_O4_DEPTH)
    # Ressalto-extrusão4: the draft: its side faces are tilted about the plane it starts from
    ressalto_extrus_o4_sides = [ressalto_extrus_o4_tool.faces().sort_by_distance(p)[0] for p in [
        (45, 0, -33.5),
        (30, -10, -33.5),
        (15, 0, -33.5),
        (30, 10, -33.5),
    ]]
    draft(ressalto_extrus_o4_sides, Plane(origin=(0, 0, -30), x_dir=(-1, 0, 0), z_dir=(0, 0, -1)), RESSALTO_EXTRUS_O4_DRAFT)


with BuildPart() as part_3:
    add(part_2.part)

    # Ressalto-extrusão4: add ressalto_extrus_o4_tool
    add(ressalto_extrus_o4_tool.part)


with BuildPart() as ressalto_extrus_o4_profile_2_tool:
    # Esboço4 → Ressalto-extrusão4 profile 2 (with draft: the straight prism first)
    with BuildSketch(Plane(origin=(0, 0, -30), x_dir=(-1, 0, 0), z_dir=(0, 0, -1))):
        with Locations((30, 0)):
            Rectangle(ESBO_O4_W, ESBO_O4_H)
    extrude(amount=RESSALTO_EXTRUS_O4_PROFILE_2_DEPTH)
    # Ressalto-extrusão4 profile 2: the draft: its side faces are tilted about the plane it starts from
    ressalto_extrus_o4_profile_2_sides = [ressalto_extrus_o4_profile_2_tool.faces().sort_by_distance(p)[0] for p in [
        (-15, 0, -33.5),
        (-30, -10, -33.5),
        (-45, 0, -33.5),
        (-30, 10, -33.5),
    ]]
    draft(ressalto_extrus_o4_profile_2_sides, Plane(origin=(0, 0, -30), x_dir=(-1, 0, 0), z_dir=(0, 0, -1)), RESSALTO_EXTRUS_O4_PROFILE_2_DRAFT)


with BuildPart() as part_4:
    add(part_3.part)

    # Ressalto-extrusão4 profile 2: add ressalto_extrus_o4_profile_2_tool
    add(ressalto_extrus_o4_profile_2_tool.part)

    # Esboço8 → Corte-extrusão1 (cut, symmetric)
    with BuildSketch(Plane(origin=(0, 0, 0), x_dir=(0, 0, -1), z_dir=(1, 0, 0))):
        Polygon((-37, 11.875644347), (-35.044130132, -11.351570595), (-37, -11.875644347), align=None)
    extrude(amount=CORTE_EXTRUS_O1_DEPTH, both=True, mode=Mode.SUBTRACT)

    # Esboço7 → Corte-extrusão2 (cut, symmetric)
    with BuildSketch(Plane(origin=(0, 0, 0), x_dir=(0, 0, -1), z_dir=(1, 0, 0))):
        Polygon((37, 11.875644347), (37, -11.875644347), (35.044130132, 11.351570595), align=None)
    extrude(amount=CORTE_EXTRUS_O2_DEPTH, both=True, mode=Mode.SUBTRACT)

    # Filete4
    # the kernel refuses this fillet: 8 mm, written as the material it takes off along each edge
    with BuildSketch(Plane(origin=(37.338485297, -11.351570595, 35.044130132), x_dir=(0, 0.2588190451025217, -0.965925826289068), z_dir=(-1, 0, 0))) as filete4_piece_1:
        with BuildLine():
            CenterArc((9.358561612, -6.847584884), FILETE4_R, 121.135363687, 69.051345366)
            Line((1.484668332, -8.262436332), (1.327190466, -8.290733361))
            Line((1.327190466, -8.290733361), (-0.157477866, -0.028297029))
            Line((-0.157477866, -0.028297029), (0, 0.16))
            ThreePointArc((0, 0.16), (2.611033888, 0.16), (5.1393379, 0.136951698))
            Line((5.1393379, 0.136951698), (5.222067776, 0))
        make_face()
    extrude(amount=74.676970595, mode=Mode.SUBTRACT)
    with BuildSketch(Plane(origin=(-7.338485297, 11.351570595, -35.044130132), x_dir=(0, -0.2588190451025215, 0.9659258262890681), z_dir=(1, 0, 0)), Plane(origin=(-67.338485297, 11.351570595, -35.044130132), x_dir=(0, -0.25881904510252435, 0.9659258262890673), z_dir=(1, 0, 0))) as filete4_piece_2:
        with BuildLine():
            CenterArc((9.358561612, 6.847584884), FILETE4_R, 169.813290948, 69.051345365)
            Line((1.484668332, 8.262436332), (1.327190466, 8.290733361))
            Line((1.327190466, 8.290733361), (-0.157477866, 0.028297029))
            Line((-0.157477866, 0.028297029), (0, -0.16))
            ThreePointArc((0, -0.16), (2.611033888, -0.16), (5.1393379, -0.136951698))
            Line((5.1393379, -0.136951698), (5.222067776, 0))
        make_face()
    extrude(amount=74.676970594, mode=Mode.SUBTRACT)


solid = part_4.part
